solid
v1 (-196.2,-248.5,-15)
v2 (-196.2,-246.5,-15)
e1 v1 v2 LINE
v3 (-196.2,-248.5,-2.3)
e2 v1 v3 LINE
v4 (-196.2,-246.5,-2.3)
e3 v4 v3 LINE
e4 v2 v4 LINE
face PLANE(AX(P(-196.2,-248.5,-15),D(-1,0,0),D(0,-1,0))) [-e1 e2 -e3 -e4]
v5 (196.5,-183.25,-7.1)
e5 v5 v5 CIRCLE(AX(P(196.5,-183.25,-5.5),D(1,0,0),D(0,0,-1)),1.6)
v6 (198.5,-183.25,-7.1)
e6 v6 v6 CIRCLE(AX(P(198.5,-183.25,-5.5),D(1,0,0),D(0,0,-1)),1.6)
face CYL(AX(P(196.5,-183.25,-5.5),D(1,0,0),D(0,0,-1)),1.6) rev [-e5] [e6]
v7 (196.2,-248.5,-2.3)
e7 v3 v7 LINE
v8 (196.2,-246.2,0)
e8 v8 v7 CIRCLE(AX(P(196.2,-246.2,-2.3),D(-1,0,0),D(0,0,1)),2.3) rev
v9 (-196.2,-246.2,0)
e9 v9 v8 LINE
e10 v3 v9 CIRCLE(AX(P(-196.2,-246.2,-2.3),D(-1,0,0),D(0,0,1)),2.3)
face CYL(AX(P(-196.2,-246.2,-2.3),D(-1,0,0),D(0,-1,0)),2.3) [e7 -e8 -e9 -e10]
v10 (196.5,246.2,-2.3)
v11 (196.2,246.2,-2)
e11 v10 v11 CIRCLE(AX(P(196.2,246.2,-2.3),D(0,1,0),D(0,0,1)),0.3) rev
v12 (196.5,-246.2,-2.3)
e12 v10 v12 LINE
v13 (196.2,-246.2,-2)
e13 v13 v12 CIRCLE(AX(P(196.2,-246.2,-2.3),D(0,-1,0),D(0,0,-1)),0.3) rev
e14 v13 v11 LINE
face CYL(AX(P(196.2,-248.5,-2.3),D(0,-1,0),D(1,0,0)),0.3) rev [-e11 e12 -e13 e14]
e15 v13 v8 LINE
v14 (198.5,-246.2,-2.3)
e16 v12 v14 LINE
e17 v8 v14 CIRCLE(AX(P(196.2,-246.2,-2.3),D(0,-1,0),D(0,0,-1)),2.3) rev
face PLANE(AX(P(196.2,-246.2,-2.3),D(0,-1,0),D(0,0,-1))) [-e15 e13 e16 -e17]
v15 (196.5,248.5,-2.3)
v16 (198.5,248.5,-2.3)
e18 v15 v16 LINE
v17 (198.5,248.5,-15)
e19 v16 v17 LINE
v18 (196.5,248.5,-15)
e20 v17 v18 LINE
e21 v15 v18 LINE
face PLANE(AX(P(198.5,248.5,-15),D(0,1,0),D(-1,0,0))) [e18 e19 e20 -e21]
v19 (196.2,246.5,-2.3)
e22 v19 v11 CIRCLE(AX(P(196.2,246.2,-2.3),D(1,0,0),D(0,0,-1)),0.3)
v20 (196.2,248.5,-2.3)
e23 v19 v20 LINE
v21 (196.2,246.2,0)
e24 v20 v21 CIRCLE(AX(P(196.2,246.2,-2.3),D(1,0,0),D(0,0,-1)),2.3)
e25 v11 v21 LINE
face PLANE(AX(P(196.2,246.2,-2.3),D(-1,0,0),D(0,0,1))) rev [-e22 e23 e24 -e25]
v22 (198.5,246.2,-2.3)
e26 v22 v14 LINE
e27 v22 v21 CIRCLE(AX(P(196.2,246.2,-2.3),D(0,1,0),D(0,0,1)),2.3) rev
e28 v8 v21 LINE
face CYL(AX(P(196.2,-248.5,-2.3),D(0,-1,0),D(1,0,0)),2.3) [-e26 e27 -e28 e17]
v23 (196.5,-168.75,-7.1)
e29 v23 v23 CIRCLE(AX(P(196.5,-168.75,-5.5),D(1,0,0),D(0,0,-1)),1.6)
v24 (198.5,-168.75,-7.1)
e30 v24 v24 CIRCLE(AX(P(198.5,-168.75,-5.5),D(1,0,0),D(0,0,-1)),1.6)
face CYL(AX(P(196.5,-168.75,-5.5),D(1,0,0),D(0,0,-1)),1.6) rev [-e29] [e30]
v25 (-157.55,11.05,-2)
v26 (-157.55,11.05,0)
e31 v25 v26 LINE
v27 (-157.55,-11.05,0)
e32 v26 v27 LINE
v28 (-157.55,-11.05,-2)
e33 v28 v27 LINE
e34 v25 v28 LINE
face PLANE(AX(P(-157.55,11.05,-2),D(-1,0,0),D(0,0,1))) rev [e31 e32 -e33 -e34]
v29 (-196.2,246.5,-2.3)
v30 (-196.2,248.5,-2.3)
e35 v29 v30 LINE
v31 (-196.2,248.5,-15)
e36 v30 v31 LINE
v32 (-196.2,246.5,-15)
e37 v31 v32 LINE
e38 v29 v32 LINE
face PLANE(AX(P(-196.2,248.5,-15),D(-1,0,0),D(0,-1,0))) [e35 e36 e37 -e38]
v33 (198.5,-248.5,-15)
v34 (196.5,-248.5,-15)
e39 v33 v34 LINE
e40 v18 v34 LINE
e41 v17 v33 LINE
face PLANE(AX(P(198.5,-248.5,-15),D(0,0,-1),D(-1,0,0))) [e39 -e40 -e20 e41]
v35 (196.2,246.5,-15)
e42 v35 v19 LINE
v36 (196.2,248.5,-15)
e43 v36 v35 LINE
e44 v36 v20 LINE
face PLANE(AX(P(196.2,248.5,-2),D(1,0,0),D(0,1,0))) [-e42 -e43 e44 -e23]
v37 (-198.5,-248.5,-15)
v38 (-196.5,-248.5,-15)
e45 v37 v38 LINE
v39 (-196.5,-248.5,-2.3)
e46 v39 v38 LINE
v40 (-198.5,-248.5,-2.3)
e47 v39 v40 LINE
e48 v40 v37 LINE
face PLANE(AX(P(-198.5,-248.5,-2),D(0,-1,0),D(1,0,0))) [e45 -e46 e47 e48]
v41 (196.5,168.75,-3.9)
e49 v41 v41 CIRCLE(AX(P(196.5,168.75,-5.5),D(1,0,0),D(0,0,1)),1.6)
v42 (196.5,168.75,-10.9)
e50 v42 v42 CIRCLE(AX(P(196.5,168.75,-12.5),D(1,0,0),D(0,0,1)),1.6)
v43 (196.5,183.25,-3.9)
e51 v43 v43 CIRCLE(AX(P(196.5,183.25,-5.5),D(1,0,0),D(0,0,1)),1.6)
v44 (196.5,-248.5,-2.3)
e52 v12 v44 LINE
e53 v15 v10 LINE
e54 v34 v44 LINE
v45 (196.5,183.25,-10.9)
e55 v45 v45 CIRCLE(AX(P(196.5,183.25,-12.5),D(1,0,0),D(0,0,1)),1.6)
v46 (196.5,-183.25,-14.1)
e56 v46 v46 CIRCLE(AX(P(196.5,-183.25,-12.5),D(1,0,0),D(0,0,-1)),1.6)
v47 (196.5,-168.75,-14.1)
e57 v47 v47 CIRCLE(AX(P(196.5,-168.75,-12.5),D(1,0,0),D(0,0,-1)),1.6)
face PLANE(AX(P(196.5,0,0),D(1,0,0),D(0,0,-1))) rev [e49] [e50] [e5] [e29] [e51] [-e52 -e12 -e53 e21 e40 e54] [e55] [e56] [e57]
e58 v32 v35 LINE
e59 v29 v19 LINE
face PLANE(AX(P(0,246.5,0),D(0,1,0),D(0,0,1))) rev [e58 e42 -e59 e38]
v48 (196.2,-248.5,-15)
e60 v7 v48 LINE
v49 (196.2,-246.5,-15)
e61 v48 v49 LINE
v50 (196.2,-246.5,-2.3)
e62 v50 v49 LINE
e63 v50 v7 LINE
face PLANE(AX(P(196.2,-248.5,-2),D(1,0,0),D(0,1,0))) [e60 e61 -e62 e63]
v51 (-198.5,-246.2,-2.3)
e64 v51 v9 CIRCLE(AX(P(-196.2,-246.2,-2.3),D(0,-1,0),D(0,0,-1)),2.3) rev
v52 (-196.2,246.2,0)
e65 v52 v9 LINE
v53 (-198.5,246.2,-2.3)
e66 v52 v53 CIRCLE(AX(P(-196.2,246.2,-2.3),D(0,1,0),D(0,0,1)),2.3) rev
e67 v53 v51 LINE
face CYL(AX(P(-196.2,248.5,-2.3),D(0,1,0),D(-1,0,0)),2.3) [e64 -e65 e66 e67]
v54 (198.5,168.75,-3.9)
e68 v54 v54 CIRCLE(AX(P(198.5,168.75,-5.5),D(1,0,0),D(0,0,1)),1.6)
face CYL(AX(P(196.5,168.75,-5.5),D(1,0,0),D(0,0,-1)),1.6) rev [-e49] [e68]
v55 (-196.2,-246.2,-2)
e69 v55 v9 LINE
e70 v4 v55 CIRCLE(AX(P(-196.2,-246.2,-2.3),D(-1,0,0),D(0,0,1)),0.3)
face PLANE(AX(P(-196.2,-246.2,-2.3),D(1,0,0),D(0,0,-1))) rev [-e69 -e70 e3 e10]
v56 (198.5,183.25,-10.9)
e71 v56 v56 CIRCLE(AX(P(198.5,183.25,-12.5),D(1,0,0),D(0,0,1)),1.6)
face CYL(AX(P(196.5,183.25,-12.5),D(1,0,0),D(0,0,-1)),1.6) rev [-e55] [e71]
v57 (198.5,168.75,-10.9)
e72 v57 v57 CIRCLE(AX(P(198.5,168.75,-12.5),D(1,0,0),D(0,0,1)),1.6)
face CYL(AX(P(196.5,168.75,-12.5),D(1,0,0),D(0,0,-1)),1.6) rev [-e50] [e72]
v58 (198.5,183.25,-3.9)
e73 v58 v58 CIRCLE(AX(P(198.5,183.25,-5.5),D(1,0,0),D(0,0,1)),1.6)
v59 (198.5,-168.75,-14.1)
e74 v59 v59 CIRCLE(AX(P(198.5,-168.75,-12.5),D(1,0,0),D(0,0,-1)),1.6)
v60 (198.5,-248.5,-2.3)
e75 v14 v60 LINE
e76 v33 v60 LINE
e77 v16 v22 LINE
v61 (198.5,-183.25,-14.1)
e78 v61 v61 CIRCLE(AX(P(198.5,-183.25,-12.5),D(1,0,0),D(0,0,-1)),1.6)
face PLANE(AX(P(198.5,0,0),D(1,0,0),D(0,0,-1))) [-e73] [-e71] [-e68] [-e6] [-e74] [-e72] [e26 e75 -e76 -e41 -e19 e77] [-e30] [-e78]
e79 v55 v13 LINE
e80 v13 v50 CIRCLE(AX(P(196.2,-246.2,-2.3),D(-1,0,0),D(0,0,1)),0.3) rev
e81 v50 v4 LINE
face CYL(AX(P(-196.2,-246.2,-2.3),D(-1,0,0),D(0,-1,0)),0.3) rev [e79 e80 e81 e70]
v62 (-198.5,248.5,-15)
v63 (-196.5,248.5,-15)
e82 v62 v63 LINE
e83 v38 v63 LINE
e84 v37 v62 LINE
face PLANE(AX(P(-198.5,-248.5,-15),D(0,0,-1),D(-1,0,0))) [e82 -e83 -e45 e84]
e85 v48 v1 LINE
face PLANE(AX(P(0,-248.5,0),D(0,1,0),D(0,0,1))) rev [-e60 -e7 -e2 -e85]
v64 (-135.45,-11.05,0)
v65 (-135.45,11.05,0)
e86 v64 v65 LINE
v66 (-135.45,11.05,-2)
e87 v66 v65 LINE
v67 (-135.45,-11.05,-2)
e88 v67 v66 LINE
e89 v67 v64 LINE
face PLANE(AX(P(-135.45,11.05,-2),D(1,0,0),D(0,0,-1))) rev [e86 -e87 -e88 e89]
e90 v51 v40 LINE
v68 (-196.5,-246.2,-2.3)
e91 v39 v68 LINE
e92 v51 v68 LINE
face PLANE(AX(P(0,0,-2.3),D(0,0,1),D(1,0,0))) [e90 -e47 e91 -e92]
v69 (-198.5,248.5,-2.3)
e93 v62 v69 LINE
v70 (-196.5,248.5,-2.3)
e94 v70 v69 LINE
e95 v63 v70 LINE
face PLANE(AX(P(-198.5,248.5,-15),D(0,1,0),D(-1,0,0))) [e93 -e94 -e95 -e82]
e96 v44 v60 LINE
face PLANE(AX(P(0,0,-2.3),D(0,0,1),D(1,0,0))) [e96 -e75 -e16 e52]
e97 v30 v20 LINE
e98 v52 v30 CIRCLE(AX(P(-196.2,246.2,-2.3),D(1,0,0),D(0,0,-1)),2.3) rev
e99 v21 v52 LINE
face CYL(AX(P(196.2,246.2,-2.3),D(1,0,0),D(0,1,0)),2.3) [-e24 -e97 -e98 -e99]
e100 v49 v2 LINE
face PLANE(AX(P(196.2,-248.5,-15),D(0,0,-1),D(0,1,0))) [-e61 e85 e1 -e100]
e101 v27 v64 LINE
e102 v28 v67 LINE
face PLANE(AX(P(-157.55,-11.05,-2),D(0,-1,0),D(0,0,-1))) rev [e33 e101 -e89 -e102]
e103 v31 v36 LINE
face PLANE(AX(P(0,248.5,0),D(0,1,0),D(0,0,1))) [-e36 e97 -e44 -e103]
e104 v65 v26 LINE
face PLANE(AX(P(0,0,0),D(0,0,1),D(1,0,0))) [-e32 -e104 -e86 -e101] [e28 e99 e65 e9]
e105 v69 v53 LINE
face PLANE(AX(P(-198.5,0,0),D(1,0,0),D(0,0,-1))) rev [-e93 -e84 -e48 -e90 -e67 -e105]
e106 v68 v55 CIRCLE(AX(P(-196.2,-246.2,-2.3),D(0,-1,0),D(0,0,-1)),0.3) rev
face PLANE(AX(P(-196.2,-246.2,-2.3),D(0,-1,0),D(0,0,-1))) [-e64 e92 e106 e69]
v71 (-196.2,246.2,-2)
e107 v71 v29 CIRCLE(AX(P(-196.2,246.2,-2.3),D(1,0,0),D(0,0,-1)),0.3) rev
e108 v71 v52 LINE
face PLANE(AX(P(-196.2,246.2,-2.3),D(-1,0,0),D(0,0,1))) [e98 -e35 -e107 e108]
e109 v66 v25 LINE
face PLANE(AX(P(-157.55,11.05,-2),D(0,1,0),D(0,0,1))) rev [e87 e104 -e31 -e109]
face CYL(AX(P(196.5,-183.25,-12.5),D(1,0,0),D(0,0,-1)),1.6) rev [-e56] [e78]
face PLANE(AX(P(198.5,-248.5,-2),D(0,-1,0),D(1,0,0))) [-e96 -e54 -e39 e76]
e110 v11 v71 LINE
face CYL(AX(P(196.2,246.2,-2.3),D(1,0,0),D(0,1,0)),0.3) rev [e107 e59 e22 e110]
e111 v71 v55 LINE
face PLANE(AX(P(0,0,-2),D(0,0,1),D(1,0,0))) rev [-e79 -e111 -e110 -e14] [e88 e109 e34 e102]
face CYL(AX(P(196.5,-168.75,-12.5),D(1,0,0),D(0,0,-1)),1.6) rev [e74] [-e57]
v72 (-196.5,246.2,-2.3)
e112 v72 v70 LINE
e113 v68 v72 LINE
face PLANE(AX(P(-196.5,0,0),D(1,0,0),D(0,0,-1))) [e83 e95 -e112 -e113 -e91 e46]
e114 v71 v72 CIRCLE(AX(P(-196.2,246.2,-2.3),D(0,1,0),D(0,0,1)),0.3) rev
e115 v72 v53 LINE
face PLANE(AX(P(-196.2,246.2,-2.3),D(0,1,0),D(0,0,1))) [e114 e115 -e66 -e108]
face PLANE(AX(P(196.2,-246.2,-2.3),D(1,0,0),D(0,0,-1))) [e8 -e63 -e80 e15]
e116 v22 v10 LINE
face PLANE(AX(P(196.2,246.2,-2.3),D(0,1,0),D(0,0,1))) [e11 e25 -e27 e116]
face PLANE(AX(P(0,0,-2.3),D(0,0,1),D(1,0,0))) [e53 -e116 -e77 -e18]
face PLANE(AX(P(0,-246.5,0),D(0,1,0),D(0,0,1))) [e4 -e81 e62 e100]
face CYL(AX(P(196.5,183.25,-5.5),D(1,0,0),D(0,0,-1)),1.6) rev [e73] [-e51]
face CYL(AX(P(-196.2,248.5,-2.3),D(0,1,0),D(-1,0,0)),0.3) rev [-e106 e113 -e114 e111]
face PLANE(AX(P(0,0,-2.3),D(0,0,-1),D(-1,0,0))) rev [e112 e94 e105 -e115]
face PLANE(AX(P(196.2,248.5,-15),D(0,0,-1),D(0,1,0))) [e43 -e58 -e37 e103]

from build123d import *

# Parameters (mm, degrees)
SKETCH_1_W                         = 397
SKETCH_1_H                         = 497
SKETCH_1_W_2                       = 22.1
SKETCH_1_H_2                       = 22.1
SM_BASE_FLANGE_1_DEPTH             = 2
SM_EDGE_FLANGE_1_STRIP_W           = 8.6
SM_EDGE_FLANGE_1_STRIP_H           = 2
SM_EDGE_FLANGE_1_STRIP_CUT_DEPTH   = 497
SM_EDGE_FLANGE_1_STRIP_2_W         = 8.6
SM_EDGE_FLANGE_1_STRIP_2_H         = 2
SM_EDGE_FLANGE_1_STRIP_CUT_2_DEPTH = 497
SM_EDGE_FLANGE_1_DEPTH             = 497
SM_EDGE_FLANGE_1_BEND_DEPTH        = 497
SM_START                           = -198.5
SM_EDGE_FLANGE_2_DEPTH             = 397
SM_EDGE_FLANGE_2_2_DEPTH           = 2.3
SM_START_2                         = 196.2
SM_EDGE_FLANGE_2_3_DEPTH           = 2.3
SM_START_3                         = -196.2
SM_EDGE_FLANGE_2_4_DEPTH           = 392.4
SKETCH_18_R                        = 1.6
CUT_EXTRUDE_1_DEPTH                = 10


# Read off the part's stored shape, not the designer's step: 边线-法兰2
# Sheet-metal steps are written as plain solids
with BuildPart() as part:
    # Sketch 1 → 基体-法兰1 (new body)
    with BuildSketch(Plane.XY):
        Rectangle(SKETCH_1_W, SKETCH_1_H)
        with Locations((-146.5, 0)):
            Rectangle(SKETCH_1_W_2, SKETCH_1_H_2, mode=Mode.SUBTRACT)
    extrude(amount=-SM_BASE_FLANGE_1_DEPTH)

    # 边线-法兰1 strip (across the edge) → 边线-法兰1 strip cut (cut)
    with BuildSketch(Plane(origin=(198.5, 248.5, -2), x_dir=(-1, 0, 0), z_dir=(0, -1, 0))):
        with Locations((-2, -1)):
            Rectangle(SM_EDGE_FLANGE_1_STRIP_W, SM_EDGE_FLANGE_1_STRIP_H)
    extrude(amount=SM_EDGE_FLANGE_1_STRIP_CUT_DEPTH, mode=Mode.SUBTRACT)

    # 边线-法兰1 strip 2 (across the edge) → 边线-法兰1 strip cut 2 (cut)
    with BuildSketch(Plane(origin=(-198.5, -248.5, -2), x_dir=(1, 0, 0), z_dir=(0, 1, 0))):
        with Locations((-2, -1)):
            Rectangle(SM_EDGE_FLANGE_1_STRIP_2_W, SM_EDGE_FLANGE_1_STRIP_2_H)
    extrude(amount=SM_EDGE_FLANGE_1_STRIP_CUT_2_DEPTH, mode=Mode.SUBTRACT)

    # 边线-法兰1 section (across the edge) → 边线-法兰1 (add)
    with BuildSketch(Plane(origin=(198.5, 248.5, -2), x_dir=(-1, 0, 0), z_dir=(0, -1, 0))):
        with BuildLine():
            Line((0, 0.3), (0, 13))
            Line((0, 13), (2, 13))
            Line((2, 13), (2, 0.3))
            ThreePointArc((2, 0.3), (2.087867966, 0.087867966), (2.3, 0))
            Line((2.3, 0), (2.3, -2))
            ThreePointArc((2.3, -2), (0.673654403, -1.326345597), (0, 0.3))
        make_face()
    extrude(amount=SM_EDGE_FLANGE_1_DEPTH)

    # 边线-法兰1 section 2 (across the edge) → 边线-法兰1 bend (add)
    with BuildSketch(Plane(origin=(-198.5, -248.5, -2), x_dir=(1, 0, 0), z_dir=(0, 1, 0))):
        with BuildLine():
            Line((0, 0.3), (0, 13))
            Line((0, 13), (2, 13))
            Line((2, 13), (2, 0.3))
            ThreePointArc((2, 0.3), (2.087867966, 0.087867966), (2.3, 0))
            Line((2.3, 0), (2.3, -2))
            ThreePointArc((2.3, -2), (0.673654403, -1.326345597), (0, 0.3))
        make_face()
    extrude(amount=SM_EDGE_FLANGE_1_BEND_DEPTH)

    # 边线-法兰2 outline → 边线-法兰2 (cut)
    with BuildSketch(Plane.YZ.offset(SM_START)):
        with BuildLine():
            Line((-246.5, -2.3), (-246.2, -2.3))
            Line((-246.2, -2.3), (-246.2, -2))
            ThreePointArc((-246.2, -2), (-246.412132034, -2.087867966), (-246.5, -2.3))
        make_face()
        with BuildLine():
            ThreePointArc((-248.5, -2.3), (-247.826345597, -0.673654403), (-246.2, 0))
            Line((-246.2, 0), (-248.5, 0))
            Line((-248.5, 0), (-248.5, -2.3))
        make_face()
        with BuildLine():
            ThreePointArc((246.5, -2.3), (246.412132034, -2.087867966), (246.2, -2))
            Line((246.2, -2), (246.2, -2.3))
            Line((246.2, -2.3), (246.5, -2.3))
        make_face()
        with BuildLine():
            Line((248.5, 0), (246.2, 0))
            ThreePointArc((246.2, 0), (247.826345597, -0.673654403), (248.5, -2.3))
            Line((248.5, -2.3), (248.5, 0))
        make_face()
    extrude(amount=SM_EDGE_FLANGE_2_DEPTH, mode=Mode.SUBTRACT)

    # Sm Edge Flange 2 2 outline → Sm Edge Flange 2 2 (cut)
    with BuildSketch(Plane.YZ.offset(SM_START)):
        with BuildLine():
            Line((-248.5, -2.3), (-246.5, -2.3))
            ThreePointArc((-246.5, -2.3), (-246.412132034, -2.087867966), (-246.2, -2))
            Line((-246.2, -2), (-246.2, 0))
            ThreePointArc((-246.2, 0), (-247.826345597, -0.673654403), (-248.5, -2.3))
        make_face()
        with BuildLine():
            ThreePointArc((248.5, -2.3), (247.826345597, -0.673654403), (246.2, 0))
            Line((246.2, 0), (246.2, -2))
            ThreePointArc((246.2, -2), (246.412132034, -2.087867966), (246.5, -2.3))
            Line((246.5, -2.3), (248.5, -2.3))
        make_face()
    extrude(amount=SM_EDGE_FLANGE_2_2_DEPTH, mode=Mode.SUBTRACT)

    # Sm Edge Flange 2 3 outline → Sm Edge Flange 2 3 (cut)
    with BuildSketch(Plane.YZ.offset(SM_START_2)):
        with BuildLine():
            Line((-248.5, -2.3), (-246.5, -2.3))
            ThreePointArc((-246.5, -2.3), (-246.412132034, -2.087867966), (-246.2, -2))
            Line((-246.2, -2), (-246.2, 0))
            ThreePointArc((-246.2, 0), (-247.826345597, -0.673654403), (-248.5, -2.3))
        make_face()
        with BuildLine():
            ThreePointArc((248.5, -2.3), (247.826345597, -0.673654403), (246.2, 0))
            Line((246.2, 0), (246.2, -2))
            ThreePointArc((246.2, -2), (246.412132034, -2.087867966), (246.5, -2.3))
            Line((246.5, -2.3), (248.5, -2.3))
        make_face()
    extrude(amount=SM_EDGE_FLANGE_2_3_DEPTH, mode=Mode.SUBTRACT)

    # Sm Edge Flange 2 4 outline → Sm Edge Flange 2 4 (add)
    with BuildSketch(Plane.YZ.offset(SM_START_3)):
        with BuildLine():
            Line((-246.5, -15), (-246.5, -2.3))
            ThreePointArc((-246.5, -2.3), (-246.412132034, -2.087867966), (-246.2, -2))
            Line((-246.2, -2), (-248.48035085, -2))
            ThreePointArc((-248.48035085, -2), (-248.495082456, -2.149678603), (-248.5, -2.3))
            Line((-248.5, -2.3), (-248.5, -15))
            Line((-248.5, -15), (-246.5, -15))
        make_face()
        with BuildLine():
            Line((248.48035085, -2), (246.2, -2))
            ThreePointArc((246.2, -2), (246.412132034, -2.087867966), (246.5, -2.3))
            Line((246.5, -2.3), (246.5, -15))
            Line((246.5, -15), (248.5, -15))
            Line((248.5, -15), (248.5, -2.3))
            ThreePointArc((248.5, -2.3), (248.495082456, -2.149678603), (248.48035085, -2))
        make_face()
    extrude(amount=SM_EDGE_FLANGE_2_4_DEPTH)

    # 草图18 → 切除-拉伸1 (cut)
    with BuildSketch(Plane(origin=(198.5, 0, 0), x_dir=(0, 0, -1), z_dir=(1, 0, 0))):
        with Locations((5.5, -183.25)):
            Circle(SKETCH_18_R)
        with Locations((12.5, -183.25)):
            Circle(SKETCH_18_R)
        with Locations((5.5, -168.75)):
            Circle(SKETCH_18_R)
        with Locations((12.5, -168.75)):
            Circle(SKETCH_18_R)
        with Locations(Location((12.5, 168.75, 0), (0, 0, 180))):
            Circle(SKETCH_18_R)
        with Locations(Location((5.5, 168.75, 0), (0, 0, 180))):
            Circle(SKETCH_18_R)
        with Locations(Location((12.5, 183.25, 0), (0, 0, 180))):
            Circle(SKETCH_18_R)
        with Locations(Location((5.5, 183.25, 0), (0, 0, 180))):
            Circle(SKETCH_18_R)
    extrude(amount=-CUT_EXTRUDE_1_DEPTH, mode=Mode.SUBTRACT)


solid = part.part
